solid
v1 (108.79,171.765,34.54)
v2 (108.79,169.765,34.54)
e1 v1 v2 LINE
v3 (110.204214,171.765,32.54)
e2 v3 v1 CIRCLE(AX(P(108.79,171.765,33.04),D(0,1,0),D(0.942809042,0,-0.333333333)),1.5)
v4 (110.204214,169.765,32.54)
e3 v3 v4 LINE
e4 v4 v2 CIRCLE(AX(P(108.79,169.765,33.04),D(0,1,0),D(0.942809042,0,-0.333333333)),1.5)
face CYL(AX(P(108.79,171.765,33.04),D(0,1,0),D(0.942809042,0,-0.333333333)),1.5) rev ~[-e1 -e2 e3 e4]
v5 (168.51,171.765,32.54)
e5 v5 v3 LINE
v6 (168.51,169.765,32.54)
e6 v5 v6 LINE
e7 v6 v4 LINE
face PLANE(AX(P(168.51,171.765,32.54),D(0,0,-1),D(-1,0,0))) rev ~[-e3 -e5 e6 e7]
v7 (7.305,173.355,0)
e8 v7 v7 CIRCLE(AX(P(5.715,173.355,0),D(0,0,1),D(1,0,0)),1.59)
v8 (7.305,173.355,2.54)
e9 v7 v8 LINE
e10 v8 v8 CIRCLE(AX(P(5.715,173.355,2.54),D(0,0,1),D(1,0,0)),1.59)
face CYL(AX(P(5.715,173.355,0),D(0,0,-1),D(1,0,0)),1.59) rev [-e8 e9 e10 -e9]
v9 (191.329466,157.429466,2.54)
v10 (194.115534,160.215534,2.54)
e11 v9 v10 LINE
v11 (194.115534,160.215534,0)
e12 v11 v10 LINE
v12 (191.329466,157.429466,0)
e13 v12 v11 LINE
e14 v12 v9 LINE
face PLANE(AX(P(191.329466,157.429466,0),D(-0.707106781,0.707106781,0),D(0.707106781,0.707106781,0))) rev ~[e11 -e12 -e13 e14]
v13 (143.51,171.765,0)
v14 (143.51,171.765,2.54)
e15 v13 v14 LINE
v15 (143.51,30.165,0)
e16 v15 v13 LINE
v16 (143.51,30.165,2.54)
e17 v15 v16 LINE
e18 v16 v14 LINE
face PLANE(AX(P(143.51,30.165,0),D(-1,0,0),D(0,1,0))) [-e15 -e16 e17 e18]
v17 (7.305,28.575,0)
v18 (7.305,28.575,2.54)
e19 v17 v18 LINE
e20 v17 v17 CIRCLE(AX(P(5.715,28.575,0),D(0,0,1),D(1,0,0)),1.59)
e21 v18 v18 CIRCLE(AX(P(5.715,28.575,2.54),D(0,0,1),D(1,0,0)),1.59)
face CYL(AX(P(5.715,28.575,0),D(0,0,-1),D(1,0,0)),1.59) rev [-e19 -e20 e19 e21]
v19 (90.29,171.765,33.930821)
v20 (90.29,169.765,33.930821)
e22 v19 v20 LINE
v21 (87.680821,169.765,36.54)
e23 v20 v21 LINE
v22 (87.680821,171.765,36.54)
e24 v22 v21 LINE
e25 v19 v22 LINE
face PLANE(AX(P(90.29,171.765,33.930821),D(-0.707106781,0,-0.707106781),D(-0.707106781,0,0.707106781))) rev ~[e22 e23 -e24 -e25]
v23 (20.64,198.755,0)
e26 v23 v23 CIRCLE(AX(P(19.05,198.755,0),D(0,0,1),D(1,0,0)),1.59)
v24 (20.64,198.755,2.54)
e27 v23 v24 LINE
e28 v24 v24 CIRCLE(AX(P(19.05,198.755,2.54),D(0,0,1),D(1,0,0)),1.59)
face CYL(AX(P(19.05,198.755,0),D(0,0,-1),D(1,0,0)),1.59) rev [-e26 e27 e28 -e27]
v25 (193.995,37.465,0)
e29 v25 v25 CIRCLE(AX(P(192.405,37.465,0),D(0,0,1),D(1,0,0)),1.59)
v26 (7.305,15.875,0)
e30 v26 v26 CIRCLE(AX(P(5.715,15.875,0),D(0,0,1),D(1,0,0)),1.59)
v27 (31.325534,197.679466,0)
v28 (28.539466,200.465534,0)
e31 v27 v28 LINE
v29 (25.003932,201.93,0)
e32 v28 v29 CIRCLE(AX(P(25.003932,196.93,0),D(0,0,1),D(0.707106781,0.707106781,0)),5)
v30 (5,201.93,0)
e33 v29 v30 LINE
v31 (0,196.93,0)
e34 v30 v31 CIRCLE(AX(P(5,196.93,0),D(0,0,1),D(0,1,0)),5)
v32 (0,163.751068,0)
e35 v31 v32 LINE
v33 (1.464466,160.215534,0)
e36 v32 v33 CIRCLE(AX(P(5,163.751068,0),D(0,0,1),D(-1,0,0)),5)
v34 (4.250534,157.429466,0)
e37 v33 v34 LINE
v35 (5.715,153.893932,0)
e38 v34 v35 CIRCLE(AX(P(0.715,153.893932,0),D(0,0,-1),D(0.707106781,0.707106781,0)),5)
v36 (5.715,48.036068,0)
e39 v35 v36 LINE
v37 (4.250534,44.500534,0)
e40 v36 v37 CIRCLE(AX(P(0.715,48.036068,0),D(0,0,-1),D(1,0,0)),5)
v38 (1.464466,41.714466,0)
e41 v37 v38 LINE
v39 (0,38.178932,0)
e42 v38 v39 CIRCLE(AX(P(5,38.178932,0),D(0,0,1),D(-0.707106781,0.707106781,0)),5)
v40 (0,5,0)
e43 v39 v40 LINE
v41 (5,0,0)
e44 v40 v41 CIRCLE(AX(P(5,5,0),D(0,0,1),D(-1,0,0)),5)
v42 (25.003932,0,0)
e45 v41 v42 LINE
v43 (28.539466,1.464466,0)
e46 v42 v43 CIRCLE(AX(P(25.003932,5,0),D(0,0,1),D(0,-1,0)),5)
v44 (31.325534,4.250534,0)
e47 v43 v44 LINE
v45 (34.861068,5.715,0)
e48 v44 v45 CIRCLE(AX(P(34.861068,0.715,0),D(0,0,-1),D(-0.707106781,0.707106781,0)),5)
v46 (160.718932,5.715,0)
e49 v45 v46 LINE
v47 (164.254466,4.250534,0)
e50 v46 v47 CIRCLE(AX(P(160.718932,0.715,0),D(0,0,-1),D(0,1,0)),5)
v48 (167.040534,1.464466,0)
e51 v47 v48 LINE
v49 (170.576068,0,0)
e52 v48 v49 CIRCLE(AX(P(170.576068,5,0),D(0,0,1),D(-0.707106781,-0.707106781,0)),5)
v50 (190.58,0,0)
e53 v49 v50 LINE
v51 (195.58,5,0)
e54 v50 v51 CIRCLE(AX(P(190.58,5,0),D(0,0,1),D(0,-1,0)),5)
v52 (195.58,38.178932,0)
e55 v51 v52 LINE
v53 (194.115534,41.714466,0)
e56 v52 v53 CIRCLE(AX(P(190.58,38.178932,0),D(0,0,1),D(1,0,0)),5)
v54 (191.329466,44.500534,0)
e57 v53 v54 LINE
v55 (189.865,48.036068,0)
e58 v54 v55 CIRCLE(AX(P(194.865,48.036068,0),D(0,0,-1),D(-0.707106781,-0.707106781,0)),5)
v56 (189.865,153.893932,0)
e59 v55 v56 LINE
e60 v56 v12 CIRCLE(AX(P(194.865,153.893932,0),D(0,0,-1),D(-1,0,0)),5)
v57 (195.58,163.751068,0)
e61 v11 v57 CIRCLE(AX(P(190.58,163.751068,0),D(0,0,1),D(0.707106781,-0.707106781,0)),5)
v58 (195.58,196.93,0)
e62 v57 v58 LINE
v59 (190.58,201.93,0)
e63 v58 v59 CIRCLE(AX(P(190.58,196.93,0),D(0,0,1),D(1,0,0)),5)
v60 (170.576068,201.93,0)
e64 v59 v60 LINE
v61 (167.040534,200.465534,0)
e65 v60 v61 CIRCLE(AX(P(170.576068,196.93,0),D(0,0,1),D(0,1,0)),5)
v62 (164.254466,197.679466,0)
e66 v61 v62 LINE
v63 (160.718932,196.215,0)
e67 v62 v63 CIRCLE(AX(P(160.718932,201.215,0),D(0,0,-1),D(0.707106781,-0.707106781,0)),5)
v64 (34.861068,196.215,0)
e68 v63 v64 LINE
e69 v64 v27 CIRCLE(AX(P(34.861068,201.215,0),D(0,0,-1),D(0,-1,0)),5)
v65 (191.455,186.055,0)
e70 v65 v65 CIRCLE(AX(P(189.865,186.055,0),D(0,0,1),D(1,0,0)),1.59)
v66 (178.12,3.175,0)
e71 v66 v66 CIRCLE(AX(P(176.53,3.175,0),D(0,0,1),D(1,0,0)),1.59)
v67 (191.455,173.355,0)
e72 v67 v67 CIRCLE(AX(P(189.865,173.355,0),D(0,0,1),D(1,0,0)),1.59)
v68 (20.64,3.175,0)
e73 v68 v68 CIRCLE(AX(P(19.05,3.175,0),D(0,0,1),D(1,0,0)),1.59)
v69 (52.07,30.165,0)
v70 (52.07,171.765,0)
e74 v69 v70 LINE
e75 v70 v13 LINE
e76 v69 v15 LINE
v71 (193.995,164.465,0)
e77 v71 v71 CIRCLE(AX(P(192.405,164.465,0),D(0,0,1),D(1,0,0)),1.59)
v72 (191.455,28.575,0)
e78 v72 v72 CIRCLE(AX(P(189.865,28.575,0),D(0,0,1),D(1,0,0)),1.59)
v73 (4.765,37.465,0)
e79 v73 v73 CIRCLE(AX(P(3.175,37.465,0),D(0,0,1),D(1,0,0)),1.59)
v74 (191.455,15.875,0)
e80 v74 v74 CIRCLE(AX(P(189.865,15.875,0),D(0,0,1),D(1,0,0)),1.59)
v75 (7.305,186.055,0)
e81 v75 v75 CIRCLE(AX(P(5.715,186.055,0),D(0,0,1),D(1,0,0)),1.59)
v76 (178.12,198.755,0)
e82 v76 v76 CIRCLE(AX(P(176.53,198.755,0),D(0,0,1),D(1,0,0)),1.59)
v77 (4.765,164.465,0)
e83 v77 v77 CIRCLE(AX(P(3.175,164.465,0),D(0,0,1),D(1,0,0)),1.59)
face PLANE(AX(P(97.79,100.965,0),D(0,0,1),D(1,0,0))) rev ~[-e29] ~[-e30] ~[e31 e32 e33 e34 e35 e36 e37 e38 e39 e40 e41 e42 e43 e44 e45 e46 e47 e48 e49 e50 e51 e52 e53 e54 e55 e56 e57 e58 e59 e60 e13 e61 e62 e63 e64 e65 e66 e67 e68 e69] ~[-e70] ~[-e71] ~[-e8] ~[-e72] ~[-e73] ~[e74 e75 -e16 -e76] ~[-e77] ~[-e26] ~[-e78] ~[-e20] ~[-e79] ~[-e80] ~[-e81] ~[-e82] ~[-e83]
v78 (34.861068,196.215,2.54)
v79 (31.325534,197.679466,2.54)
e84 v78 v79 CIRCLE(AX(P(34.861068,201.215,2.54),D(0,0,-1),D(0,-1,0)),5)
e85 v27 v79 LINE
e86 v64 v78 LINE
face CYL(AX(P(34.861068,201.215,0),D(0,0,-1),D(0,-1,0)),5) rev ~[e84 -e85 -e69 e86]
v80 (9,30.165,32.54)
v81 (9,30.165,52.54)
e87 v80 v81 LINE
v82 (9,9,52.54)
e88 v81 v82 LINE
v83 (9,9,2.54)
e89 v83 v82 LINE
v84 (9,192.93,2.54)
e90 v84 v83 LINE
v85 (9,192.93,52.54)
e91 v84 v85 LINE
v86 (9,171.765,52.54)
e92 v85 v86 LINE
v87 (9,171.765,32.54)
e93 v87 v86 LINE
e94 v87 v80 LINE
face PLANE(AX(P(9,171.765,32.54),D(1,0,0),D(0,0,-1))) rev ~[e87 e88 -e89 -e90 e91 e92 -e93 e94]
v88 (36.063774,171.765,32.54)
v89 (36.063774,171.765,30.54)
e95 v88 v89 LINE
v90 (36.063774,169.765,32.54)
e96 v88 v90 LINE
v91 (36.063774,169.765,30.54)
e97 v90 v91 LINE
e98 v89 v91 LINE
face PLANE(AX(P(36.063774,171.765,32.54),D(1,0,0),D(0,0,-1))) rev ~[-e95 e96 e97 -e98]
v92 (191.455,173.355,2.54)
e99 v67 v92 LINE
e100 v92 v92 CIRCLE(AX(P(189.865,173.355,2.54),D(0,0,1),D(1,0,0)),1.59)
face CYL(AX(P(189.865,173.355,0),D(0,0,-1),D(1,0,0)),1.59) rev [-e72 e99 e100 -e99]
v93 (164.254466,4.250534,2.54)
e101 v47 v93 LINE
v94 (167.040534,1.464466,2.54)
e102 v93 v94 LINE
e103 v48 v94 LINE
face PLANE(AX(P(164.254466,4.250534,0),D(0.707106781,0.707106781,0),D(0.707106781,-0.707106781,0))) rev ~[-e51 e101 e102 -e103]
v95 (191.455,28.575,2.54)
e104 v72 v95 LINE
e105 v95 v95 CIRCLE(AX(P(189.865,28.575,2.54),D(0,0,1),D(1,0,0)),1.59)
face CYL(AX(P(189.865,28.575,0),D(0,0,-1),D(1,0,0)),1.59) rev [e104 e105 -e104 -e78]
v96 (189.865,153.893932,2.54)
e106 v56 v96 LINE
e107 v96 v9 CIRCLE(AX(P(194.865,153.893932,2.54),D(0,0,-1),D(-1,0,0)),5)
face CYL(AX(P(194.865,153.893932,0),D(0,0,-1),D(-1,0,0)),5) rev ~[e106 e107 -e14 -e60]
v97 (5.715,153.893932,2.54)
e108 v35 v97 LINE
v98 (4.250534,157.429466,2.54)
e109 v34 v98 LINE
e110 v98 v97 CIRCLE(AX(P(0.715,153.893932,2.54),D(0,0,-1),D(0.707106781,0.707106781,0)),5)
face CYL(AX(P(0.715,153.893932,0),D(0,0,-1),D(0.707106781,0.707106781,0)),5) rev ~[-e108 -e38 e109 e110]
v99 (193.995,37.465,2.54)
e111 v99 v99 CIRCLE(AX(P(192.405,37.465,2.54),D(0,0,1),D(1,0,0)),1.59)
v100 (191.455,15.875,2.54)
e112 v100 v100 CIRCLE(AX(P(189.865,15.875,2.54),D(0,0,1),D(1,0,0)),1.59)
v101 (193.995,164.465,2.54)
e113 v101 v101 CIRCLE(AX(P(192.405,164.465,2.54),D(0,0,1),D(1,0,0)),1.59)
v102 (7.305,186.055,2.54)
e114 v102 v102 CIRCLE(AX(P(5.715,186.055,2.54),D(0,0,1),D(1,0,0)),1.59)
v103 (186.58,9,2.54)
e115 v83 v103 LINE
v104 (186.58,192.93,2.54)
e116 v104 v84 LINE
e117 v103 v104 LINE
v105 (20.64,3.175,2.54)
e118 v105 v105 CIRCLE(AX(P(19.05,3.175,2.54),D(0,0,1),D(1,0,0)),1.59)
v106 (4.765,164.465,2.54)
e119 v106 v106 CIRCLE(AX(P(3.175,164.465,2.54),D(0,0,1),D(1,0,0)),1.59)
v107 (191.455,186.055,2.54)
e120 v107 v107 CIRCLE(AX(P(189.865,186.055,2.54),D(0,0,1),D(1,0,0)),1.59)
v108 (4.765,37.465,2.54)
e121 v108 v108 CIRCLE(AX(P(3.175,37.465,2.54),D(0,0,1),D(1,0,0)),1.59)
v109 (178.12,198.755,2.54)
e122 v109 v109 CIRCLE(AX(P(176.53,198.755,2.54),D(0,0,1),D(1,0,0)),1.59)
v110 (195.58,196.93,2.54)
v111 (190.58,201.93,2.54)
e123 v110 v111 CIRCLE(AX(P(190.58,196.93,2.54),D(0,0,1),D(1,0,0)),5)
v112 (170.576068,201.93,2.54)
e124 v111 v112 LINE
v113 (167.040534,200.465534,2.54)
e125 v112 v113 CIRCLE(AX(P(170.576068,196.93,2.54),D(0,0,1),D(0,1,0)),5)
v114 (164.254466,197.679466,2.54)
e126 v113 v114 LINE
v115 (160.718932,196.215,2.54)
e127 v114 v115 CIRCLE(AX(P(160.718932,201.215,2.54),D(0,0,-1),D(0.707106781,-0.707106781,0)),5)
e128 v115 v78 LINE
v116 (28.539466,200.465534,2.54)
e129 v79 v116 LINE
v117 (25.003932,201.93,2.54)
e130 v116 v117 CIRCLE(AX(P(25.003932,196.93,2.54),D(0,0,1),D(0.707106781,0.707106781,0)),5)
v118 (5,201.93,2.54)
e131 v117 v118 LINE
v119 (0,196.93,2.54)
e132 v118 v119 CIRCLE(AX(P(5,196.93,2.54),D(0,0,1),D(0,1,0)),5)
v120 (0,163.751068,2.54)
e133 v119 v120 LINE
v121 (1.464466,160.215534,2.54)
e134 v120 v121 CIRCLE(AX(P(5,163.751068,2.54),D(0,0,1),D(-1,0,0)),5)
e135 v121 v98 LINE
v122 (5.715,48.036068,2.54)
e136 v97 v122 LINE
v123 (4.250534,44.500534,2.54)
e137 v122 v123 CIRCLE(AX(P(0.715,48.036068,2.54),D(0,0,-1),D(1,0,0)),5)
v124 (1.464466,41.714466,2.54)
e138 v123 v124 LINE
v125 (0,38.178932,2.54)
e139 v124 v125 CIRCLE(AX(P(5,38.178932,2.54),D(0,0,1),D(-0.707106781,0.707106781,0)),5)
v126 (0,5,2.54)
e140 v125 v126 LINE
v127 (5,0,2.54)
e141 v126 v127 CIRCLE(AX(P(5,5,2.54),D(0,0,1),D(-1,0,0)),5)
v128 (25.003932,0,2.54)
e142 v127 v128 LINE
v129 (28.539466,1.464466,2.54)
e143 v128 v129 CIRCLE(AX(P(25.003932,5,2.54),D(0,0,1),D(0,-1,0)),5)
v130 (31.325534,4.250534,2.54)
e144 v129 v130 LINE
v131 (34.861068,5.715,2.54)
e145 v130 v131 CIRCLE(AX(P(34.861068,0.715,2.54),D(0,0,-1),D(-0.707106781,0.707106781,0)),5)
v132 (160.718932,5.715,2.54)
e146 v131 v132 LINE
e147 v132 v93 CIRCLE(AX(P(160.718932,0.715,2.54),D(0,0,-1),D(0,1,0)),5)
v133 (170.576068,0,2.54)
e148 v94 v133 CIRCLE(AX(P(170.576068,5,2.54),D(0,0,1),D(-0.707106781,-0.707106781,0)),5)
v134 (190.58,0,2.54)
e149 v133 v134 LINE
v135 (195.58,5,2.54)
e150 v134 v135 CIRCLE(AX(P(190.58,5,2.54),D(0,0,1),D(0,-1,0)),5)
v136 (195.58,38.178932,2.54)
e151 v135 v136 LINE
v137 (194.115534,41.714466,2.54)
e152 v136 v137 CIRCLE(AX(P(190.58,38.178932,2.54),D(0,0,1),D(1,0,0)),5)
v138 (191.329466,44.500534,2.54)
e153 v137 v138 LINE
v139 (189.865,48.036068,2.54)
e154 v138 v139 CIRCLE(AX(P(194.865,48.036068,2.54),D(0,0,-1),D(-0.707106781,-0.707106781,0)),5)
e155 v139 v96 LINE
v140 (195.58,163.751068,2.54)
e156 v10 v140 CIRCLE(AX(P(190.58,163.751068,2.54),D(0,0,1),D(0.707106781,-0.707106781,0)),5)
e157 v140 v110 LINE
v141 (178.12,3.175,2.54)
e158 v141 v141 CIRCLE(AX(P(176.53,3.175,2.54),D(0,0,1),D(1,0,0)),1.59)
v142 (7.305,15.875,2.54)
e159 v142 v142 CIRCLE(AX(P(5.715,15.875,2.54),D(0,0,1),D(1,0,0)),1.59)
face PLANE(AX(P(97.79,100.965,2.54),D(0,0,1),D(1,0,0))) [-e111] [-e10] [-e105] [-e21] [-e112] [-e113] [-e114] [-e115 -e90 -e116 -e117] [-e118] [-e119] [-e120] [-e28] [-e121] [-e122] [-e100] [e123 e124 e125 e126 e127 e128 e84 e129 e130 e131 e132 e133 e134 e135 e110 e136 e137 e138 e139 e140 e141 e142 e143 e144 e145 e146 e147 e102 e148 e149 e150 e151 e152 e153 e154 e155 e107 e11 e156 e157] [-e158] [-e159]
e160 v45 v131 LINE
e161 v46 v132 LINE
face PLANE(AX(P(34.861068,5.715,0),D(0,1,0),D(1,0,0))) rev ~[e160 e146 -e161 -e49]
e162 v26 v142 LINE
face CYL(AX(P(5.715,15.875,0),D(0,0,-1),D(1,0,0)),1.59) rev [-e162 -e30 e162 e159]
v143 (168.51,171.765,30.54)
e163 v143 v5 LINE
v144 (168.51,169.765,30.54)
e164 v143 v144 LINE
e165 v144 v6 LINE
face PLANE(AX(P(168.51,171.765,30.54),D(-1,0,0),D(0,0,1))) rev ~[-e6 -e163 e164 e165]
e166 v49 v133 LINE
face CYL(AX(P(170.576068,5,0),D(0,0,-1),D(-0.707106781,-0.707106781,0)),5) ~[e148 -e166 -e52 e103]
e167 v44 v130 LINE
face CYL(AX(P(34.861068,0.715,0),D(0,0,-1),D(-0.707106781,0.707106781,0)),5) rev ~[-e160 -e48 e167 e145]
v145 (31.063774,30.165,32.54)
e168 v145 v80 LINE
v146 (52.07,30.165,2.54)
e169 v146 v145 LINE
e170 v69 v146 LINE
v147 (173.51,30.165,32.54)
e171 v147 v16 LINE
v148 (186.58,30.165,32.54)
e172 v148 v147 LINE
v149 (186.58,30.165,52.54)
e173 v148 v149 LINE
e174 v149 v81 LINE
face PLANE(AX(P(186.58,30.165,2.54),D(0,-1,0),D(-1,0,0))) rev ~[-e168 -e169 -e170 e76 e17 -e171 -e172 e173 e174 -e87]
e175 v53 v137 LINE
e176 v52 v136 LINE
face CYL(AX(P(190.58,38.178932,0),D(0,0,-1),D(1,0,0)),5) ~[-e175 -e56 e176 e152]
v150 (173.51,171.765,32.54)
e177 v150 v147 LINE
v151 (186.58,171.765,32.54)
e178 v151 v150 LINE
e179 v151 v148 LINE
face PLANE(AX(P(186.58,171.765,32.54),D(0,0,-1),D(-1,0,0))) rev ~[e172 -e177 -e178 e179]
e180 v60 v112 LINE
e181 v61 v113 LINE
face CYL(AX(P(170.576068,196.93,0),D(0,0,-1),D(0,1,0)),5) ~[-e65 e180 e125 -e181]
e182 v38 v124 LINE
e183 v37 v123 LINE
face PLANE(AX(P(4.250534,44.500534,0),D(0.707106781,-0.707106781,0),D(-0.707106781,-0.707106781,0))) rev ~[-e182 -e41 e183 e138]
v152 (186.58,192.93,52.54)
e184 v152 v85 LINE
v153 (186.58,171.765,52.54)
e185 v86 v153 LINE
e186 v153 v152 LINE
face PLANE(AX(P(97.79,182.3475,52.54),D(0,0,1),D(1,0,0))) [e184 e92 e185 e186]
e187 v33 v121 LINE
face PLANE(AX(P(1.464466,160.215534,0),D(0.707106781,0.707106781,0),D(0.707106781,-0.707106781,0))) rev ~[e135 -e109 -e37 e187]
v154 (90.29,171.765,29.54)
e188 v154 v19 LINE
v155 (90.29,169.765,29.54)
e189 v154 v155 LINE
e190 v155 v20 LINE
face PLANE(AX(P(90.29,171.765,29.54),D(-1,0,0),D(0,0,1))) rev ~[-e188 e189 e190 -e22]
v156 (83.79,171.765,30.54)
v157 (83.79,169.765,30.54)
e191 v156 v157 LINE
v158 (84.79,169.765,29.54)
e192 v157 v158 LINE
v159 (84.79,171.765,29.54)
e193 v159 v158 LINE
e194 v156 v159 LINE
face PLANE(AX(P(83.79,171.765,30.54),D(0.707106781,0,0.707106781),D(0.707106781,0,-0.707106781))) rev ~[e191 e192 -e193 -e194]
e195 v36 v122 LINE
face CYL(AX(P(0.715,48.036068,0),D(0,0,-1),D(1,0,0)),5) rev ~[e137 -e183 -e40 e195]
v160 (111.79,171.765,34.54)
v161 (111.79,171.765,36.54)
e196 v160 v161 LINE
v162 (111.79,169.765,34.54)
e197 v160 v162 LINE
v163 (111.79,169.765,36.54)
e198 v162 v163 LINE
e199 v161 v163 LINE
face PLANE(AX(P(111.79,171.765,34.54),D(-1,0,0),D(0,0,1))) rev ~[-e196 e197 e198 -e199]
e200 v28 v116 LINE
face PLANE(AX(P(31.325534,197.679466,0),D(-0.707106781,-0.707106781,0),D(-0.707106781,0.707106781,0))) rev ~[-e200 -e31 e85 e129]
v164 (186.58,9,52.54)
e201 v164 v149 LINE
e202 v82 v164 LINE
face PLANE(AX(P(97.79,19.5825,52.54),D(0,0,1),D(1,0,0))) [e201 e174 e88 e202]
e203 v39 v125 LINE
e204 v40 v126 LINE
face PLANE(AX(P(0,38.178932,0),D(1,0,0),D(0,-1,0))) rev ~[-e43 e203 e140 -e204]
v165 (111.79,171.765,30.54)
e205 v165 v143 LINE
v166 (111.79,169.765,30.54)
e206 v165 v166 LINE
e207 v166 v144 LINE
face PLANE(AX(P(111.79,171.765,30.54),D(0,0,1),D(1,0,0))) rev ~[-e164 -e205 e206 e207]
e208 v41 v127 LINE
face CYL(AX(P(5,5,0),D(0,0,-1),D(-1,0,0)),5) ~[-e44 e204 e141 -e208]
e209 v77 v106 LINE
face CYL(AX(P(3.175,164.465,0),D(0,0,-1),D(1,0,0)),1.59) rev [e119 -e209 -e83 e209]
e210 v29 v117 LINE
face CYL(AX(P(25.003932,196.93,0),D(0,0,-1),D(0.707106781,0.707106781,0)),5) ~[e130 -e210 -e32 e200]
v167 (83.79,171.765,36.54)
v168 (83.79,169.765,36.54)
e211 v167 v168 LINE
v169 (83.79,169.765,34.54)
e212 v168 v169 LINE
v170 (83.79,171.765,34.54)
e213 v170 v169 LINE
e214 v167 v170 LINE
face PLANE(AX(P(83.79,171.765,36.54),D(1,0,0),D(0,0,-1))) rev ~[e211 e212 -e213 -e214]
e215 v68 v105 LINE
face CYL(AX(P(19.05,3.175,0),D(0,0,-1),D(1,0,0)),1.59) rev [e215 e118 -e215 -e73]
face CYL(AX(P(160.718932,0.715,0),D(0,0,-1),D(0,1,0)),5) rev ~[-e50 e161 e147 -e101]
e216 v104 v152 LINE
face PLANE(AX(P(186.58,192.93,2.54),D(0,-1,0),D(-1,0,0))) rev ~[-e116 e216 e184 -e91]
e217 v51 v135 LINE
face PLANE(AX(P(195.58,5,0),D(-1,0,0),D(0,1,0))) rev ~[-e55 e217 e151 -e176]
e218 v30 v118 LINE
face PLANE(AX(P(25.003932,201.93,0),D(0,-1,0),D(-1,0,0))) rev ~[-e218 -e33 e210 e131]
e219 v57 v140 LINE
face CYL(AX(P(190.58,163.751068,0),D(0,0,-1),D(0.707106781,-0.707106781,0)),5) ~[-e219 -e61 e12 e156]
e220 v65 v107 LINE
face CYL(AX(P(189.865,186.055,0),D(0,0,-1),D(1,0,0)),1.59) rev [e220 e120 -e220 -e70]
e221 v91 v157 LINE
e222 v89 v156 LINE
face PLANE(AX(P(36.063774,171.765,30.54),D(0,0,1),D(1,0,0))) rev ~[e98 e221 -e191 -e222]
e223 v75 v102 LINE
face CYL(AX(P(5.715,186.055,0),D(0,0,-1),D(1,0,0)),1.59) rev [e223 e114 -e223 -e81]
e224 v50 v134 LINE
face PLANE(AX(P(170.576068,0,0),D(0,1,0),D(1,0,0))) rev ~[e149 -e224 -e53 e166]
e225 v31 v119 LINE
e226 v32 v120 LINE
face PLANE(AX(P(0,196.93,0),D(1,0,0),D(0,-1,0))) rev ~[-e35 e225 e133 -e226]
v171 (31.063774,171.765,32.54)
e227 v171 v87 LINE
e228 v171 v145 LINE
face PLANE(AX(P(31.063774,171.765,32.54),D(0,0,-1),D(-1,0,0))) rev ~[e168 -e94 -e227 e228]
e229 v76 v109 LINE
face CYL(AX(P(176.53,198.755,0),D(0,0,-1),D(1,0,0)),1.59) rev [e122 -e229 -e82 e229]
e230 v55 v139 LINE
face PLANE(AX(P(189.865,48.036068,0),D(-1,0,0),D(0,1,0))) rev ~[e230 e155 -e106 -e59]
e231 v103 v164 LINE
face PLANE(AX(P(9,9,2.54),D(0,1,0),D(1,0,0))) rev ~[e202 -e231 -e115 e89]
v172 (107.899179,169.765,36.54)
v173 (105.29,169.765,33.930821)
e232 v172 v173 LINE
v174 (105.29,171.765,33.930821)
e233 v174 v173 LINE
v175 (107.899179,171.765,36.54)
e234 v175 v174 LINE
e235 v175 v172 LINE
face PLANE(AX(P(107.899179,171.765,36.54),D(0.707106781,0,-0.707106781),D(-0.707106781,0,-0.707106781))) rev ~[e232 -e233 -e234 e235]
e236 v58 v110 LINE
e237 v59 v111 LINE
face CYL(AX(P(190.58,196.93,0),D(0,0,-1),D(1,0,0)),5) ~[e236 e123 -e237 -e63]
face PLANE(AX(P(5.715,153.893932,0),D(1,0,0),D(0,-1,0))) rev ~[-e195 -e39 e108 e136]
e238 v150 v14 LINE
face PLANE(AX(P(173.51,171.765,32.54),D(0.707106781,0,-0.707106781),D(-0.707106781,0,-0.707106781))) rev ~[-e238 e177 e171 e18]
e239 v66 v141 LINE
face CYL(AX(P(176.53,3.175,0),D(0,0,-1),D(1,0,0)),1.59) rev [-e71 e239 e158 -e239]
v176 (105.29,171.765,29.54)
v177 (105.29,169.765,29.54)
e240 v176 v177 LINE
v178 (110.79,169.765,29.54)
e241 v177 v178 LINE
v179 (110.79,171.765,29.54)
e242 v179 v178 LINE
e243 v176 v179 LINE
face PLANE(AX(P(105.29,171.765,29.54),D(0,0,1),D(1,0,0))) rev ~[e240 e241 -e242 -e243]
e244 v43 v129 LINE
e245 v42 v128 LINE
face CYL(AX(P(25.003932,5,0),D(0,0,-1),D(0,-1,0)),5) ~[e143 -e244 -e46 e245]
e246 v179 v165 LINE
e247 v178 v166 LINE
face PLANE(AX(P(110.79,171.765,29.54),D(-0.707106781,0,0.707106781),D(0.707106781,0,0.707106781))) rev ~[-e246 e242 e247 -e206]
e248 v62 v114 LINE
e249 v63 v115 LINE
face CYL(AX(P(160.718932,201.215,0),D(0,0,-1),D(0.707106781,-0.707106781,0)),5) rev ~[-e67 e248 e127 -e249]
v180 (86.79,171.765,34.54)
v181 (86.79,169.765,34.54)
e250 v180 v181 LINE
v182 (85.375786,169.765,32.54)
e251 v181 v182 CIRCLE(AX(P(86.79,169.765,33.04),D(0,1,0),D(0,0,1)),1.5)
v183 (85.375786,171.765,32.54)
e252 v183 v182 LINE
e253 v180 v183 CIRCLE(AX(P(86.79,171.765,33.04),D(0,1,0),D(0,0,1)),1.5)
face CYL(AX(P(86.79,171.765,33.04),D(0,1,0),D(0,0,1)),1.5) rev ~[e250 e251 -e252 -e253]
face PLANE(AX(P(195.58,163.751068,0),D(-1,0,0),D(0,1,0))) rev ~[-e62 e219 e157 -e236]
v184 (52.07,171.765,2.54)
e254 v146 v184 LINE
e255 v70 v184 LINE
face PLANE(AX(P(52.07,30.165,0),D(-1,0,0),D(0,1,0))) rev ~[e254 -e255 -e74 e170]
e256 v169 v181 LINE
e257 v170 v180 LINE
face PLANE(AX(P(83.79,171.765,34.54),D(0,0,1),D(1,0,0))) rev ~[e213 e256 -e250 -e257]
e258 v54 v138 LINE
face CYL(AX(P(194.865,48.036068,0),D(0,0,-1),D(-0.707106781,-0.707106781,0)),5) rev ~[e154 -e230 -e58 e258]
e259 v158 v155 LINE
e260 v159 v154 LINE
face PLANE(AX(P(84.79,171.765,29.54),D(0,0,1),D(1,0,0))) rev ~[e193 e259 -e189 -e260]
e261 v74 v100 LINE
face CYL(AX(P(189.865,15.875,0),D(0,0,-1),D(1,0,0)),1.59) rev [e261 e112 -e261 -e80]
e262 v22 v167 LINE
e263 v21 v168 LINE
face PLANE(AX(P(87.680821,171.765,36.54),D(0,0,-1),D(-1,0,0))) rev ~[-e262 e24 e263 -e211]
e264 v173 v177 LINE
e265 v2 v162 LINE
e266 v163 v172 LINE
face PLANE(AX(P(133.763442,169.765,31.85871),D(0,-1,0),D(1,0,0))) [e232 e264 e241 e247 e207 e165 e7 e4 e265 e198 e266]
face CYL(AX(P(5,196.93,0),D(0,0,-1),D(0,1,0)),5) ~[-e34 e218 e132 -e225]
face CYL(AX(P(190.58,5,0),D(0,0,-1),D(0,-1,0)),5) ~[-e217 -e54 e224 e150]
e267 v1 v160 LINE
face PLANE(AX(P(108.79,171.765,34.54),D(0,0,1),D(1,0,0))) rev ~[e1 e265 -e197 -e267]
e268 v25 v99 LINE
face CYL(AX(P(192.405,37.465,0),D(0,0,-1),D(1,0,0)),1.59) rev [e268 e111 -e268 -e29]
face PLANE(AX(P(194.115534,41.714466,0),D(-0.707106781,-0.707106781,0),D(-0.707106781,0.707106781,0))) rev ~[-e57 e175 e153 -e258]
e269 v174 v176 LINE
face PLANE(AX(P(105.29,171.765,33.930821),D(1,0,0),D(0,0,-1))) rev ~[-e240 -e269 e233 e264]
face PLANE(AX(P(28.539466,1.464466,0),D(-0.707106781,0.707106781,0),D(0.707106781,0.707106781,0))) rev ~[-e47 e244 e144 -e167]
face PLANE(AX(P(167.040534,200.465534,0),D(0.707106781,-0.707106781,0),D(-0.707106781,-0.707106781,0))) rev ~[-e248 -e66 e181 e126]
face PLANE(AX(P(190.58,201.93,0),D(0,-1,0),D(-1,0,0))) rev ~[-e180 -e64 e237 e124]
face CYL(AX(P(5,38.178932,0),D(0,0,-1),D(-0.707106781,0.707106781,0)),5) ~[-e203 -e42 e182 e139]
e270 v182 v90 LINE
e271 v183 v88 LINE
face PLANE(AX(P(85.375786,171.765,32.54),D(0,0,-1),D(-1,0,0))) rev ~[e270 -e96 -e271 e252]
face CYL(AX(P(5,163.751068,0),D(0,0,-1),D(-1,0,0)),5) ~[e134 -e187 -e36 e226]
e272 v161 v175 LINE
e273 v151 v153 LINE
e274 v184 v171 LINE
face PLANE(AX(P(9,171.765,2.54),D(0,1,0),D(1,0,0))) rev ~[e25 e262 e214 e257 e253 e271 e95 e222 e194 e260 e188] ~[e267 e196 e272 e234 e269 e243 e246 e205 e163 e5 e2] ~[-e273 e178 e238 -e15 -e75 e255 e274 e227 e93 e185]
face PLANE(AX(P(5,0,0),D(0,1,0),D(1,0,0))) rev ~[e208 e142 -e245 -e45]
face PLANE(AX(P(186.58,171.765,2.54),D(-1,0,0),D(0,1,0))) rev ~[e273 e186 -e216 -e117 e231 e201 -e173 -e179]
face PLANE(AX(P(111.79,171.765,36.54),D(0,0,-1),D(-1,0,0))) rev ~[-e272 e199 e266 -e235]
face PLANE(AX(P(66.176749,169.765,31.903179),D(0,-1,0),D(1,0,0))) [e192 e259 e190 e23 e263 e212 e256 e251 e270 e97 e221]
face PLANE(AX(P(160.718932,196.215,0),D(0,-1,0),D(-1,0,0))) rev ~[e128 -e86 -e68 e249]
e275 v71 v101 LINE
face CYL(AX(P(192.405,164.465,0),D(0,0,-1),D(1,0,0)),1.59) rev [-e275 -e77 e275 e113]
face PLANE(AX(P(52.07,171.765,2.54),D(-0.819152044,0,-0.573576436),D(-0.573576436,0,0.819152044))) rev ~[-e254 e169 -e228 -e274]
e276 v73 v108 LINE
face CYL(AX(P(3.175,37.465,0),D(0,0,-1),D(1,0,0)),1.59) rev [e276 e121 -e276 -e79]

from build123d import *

# Parameters (mm, degrees)
F0_R     = 1.59
F0_W     = 91.44
F0_H     = 141.6
F1_DEPTH = 2.54
F3_DEPTH = 50
F5_DEPTH = 141.6
F7_DEPTH = 2


# Not quite as in the source:
# - a feature names something its author has since deleted; it is built from what else it names


with BuildPart() as f1:
    # F0 (on Top) → F1 (new body)
    with BuildSketch(Plane.XY):
        with BuildLine():
            ThreePointArc((0, 5), (1.4644660941, 1.4644660941), (5, 0))
            Line((5, 0), (25.0039321881, 0))
            ThreePointArc((25.0039321881, 0), (26.91734935, 0.3806023374), (28.5394660941, 1.4644660941))
            Line((28.5394660941, 1.4644660941), (31.3255339059, 4.2505339059))
            ThreePointArc((31.3255339059, 4.2505339059), (32.94765065, 5.3343976626), (34.8610678119, 5.715))
            Line((34.8610678119, 5.715), (160.7189321881, 5.715))
            ThreePointArc((160.7189321881, 5.715), (162.63234935, 5.3343976626), (164.2544660941, 4.2505339059))
            Line((164.2544660941, 4.2505339059), (167.0405339059, 1.4644660941))
            ThreePointArc((167.0405339059, 1.4644660941), (168.66265065, 0.3806023374), (170.5760678119, 0))
            Line((170.5760678119, 0), (190.58, 0))
            ThreePointArc((190.58, 0), (194.1155339059, 1.4644660941), (195.58, 5))
            Line((195.58, 5), (195.58, 38.1789321881))
            ThreePointArc((195.58, 38.1789321881), (195.1993976626, 40.09234935), (194.1155339059, 41.7144660941))
            Line((194.1155339059, 41.7144660941), (191.3294660941, 44.5005339059))
            ThreePointArc((191.3294660941, 44.5005339059), (190.2456023374, 46.12265065), (189.865, 48.0360678119))
            Line((189.865, 48.0360678119), (189.865, 153.8939321881))
            ThreePointArc((189.865, 153.8939321881), (190.2456023374, 155.80734935), (191.3294660941, 157.4294660941))
            Line((191.3294660941, 157.4294660941), (194.1155339059, 160.2155339059))
            ThreePointArc((194.1155339059, 160.2155339059), (195.1993976626, 161.83765065), (195.58, 163.7510678119))
            Line((195.58, 163.7510678119), (195.58, 196.93))
            ThreePointArc((195.58, 196.93), (194.1155339059, 200.4655339059), (190.58, 201.93))
            Line((190.58, 201.93), (170.5760678119, 201.93))
            ThreePointArc((170.5760678119, 201.93), (168.66265065, 201.5493976626), (167.0405339059, 200.4655339059))
            Line((167.0405339059, 200.4655339059), (164.2544660941, 197.6794660941))
            ThreePointArc((164.2544660941, 197.6794660941), (162.63234935, 196.5956023374), (160.7189321881, 196.215))
            Line((160.7189321881, 196.215), (34.8610678119, 196.215))
            ThreePointArc((34.8610678119, 196.215), (32.94765065, 196.5956023374), (31.3255339059, 197.6794660941))
            Line((31.3255339059, 197.6794660941), (28.5394660941, 200.4655339059))
            ThreePointArc((28.5394660941, 200.4655339059), (26.91734935, 201.5493976626), (25.0039321881, 201.93))
            Line((25.0039321881, 201.93), (5, 201.93))
            ThreePointArc((5, 201.93), (1.4644660941, 200.4655339059), (0, 196.93))
            Line((0, 196.93), (0, 163.7510678119))
            ThreePointArc((0, 163.7510678119), (0.3806023374, 161.83765065), (1.4644660941, 160.2155339059))
            Line((1.4644660941, 160.2155339059), (4.2505339059, 157.4294660941))
            ThreePointArc((4.2505339059, 157.4294660941), (5.3343976626, 155.80734935), (5.715, 153.8939321881))
            Line((5.715, 153.8939321881), (5.715, 48.0360678119))
            ThreePointArc((5.715, 48.0360678119), (5.3343976626, 46.12265065), (4.2505339059, 44.5005339059))
            Line((4.2505339059, 44.5005339059), (1.4644660941, 41.7144660941))
            ThreePointArc((1.4644660941, 41.7144660941), (0.3806023374, 40.09234935), (0, 38.1789321881))
            Line((0, 38.1789321881), (0, 5))
        make_face()
        with Locations((19.05, 3.175)):
            Circle(F0_R, mode=Mode.SUBTRACT)
        with Locations((5.715, 15.875)):
            Circle(F0_R, mode=Mode.SUBTRACT)
        with Locations((5.715, 28.575)):
            Circle(F0_R, mode=Mode.SUBTRACT)
        with Locations((3.175, 37.465)):
            Circle(F0_R, mode=Mode.SUBTRACT)
        with Locations((97.79, 100.965)):
            Rectangle(F0_W, F0_H, mode=Mode.SUBTRACT)
        with Locations((176.53, 3.175)):
            Circle(F0_R, mode=Mode.SUBTRACT)
        with Locations((189.865, 15.875)):
            Circle(F0_R, mode=Mode.SUBTRACT)
        with Locations((189.865, 28.575)):
            Circle(F0_R, mode=Mode.SUBTRACT)
        with Locations((192.405, 37.465)):
            Circle(F0_R, mode=Mode.SUBTRACT)
        with Locations((3.175, 164.465)):
            Circle(F0_R, mode=Mode.SUBTRACT)
        with Locations((5.715, 173.355)):
            Circle(F0_R, mode=Mode.SUBTRACT)
        with Locations((5.715, 186.055)):
            Circle(F0_R, mode=Mode.SUBTRACT)
        with Locations((19.05, 198.755)):
            Circle(F0_R, mode=Mode.SUBTRACT)
        with Locations((192.405, 164.465)):
            Circle(F0_R, mode=Mode.SUBTRACT)
        with Locations((189.865, 173.355)):
            Circle(F0_R, mode=Mode.SUBTRACT)
        with Locations((189.865, 186.055)):
            Circle(F0_R, mode=Mode.SUBTRACT)
        with Locations((176.53, 198.755)):
            Circle(F0_R, mode=Mode.SUBTRACT)
    extrude(amount=F1_DEPTH)

    # F2 (on face) → F3 (join)
    with BuildSketch(Plane.XY.offset(2.54)):
        Polygon((9, 192.93), (9, 171.765), (52.07, 171.765), (143.51, 171.765), (186.58, 171.765), (186.58, 192.93), align=None)
        Polygon((143.51, 30.165), (52.07, 30.165), (9, 30.165), (9, 9), (186.58, 9), (186.58, 30.165), align=None)
    extrude(amount=F3_DEPTH)

    # F4 (on face) → F5 (join, through all)
    with BuildSketch(Plane.XZ.offset(-171.765)):
        Polygon((9, 2.54), (52.07, 2.54), (31.0637738537, 32.54), (9, 32.54), align=None)
        Polygon((143.51, 2.54), (186.58, 2.54), (186.58, 32.54), (173.51, 32.54), align=None)
    extrude(amount=F5_DEPTH)

    # F6 (on face) → F7 (join)
    with BuildSketch(Plane.XZ.offset(-171.765)):
        with BuildLine():
            Line((105.29, 33.9308214303), (105.29, 29.54))
            Line((105.29, 29.54), (110.79, 29.54))
            Line((110.79, 29.54), (111.79, 30.54))
            Line((111.79, 30.54), (168.51, 30.54))
            Line((168.51, 30.54), (168.51, 32.54))
            Line((168.51, 32.54), (110.2042135624, 32.54))
            ThreePointArc((110.2042135624, 32.54), (107.5652551286, 32.1739745962), (108.79, 34.54))
            Line((108.79, 34.54), (111.79, 34.54))
            Line((111.79, 34.54), (111.79, 36.54))
            Line((111.79, 36.54), (107.8991785697, 36.54))
            Line((107.8991785697, 36.54), (105.29, 33.9308214303))
        make_face()
        with BuildLine():
            Line((36.0637738537, 30.54), (83.79, 30.54))
            Line((83.79, 30.54), (84.79, 29.54))
            Line((84.79, 29.54), (90.29, 29.54))
            Line((90.29, 29.54), (90.29, 33.9308214303))
            Line((90.29, 33.9308214303), (87.6808214303, 36.54))
            Line((87.6808214303, 36.54), (83.79, 36.54))
            Line((83.79, 36.54), (83.79, 34.54))
            Line((83.79, 34.54), (86.79, 34.54))
            ThreePointArc((86.79, 34.54), (88.0147448714, 32.1739745962), (85.3757864376, 32.54))
            Line((85.3757864376, 32.54), (36.0637738537, 32.54))
            Line((36.0637738537, 32.54), (36.0637738537, 30.54))
        make_face()
    extrude(amount=F7_DEPTH)


solid = f1.part
